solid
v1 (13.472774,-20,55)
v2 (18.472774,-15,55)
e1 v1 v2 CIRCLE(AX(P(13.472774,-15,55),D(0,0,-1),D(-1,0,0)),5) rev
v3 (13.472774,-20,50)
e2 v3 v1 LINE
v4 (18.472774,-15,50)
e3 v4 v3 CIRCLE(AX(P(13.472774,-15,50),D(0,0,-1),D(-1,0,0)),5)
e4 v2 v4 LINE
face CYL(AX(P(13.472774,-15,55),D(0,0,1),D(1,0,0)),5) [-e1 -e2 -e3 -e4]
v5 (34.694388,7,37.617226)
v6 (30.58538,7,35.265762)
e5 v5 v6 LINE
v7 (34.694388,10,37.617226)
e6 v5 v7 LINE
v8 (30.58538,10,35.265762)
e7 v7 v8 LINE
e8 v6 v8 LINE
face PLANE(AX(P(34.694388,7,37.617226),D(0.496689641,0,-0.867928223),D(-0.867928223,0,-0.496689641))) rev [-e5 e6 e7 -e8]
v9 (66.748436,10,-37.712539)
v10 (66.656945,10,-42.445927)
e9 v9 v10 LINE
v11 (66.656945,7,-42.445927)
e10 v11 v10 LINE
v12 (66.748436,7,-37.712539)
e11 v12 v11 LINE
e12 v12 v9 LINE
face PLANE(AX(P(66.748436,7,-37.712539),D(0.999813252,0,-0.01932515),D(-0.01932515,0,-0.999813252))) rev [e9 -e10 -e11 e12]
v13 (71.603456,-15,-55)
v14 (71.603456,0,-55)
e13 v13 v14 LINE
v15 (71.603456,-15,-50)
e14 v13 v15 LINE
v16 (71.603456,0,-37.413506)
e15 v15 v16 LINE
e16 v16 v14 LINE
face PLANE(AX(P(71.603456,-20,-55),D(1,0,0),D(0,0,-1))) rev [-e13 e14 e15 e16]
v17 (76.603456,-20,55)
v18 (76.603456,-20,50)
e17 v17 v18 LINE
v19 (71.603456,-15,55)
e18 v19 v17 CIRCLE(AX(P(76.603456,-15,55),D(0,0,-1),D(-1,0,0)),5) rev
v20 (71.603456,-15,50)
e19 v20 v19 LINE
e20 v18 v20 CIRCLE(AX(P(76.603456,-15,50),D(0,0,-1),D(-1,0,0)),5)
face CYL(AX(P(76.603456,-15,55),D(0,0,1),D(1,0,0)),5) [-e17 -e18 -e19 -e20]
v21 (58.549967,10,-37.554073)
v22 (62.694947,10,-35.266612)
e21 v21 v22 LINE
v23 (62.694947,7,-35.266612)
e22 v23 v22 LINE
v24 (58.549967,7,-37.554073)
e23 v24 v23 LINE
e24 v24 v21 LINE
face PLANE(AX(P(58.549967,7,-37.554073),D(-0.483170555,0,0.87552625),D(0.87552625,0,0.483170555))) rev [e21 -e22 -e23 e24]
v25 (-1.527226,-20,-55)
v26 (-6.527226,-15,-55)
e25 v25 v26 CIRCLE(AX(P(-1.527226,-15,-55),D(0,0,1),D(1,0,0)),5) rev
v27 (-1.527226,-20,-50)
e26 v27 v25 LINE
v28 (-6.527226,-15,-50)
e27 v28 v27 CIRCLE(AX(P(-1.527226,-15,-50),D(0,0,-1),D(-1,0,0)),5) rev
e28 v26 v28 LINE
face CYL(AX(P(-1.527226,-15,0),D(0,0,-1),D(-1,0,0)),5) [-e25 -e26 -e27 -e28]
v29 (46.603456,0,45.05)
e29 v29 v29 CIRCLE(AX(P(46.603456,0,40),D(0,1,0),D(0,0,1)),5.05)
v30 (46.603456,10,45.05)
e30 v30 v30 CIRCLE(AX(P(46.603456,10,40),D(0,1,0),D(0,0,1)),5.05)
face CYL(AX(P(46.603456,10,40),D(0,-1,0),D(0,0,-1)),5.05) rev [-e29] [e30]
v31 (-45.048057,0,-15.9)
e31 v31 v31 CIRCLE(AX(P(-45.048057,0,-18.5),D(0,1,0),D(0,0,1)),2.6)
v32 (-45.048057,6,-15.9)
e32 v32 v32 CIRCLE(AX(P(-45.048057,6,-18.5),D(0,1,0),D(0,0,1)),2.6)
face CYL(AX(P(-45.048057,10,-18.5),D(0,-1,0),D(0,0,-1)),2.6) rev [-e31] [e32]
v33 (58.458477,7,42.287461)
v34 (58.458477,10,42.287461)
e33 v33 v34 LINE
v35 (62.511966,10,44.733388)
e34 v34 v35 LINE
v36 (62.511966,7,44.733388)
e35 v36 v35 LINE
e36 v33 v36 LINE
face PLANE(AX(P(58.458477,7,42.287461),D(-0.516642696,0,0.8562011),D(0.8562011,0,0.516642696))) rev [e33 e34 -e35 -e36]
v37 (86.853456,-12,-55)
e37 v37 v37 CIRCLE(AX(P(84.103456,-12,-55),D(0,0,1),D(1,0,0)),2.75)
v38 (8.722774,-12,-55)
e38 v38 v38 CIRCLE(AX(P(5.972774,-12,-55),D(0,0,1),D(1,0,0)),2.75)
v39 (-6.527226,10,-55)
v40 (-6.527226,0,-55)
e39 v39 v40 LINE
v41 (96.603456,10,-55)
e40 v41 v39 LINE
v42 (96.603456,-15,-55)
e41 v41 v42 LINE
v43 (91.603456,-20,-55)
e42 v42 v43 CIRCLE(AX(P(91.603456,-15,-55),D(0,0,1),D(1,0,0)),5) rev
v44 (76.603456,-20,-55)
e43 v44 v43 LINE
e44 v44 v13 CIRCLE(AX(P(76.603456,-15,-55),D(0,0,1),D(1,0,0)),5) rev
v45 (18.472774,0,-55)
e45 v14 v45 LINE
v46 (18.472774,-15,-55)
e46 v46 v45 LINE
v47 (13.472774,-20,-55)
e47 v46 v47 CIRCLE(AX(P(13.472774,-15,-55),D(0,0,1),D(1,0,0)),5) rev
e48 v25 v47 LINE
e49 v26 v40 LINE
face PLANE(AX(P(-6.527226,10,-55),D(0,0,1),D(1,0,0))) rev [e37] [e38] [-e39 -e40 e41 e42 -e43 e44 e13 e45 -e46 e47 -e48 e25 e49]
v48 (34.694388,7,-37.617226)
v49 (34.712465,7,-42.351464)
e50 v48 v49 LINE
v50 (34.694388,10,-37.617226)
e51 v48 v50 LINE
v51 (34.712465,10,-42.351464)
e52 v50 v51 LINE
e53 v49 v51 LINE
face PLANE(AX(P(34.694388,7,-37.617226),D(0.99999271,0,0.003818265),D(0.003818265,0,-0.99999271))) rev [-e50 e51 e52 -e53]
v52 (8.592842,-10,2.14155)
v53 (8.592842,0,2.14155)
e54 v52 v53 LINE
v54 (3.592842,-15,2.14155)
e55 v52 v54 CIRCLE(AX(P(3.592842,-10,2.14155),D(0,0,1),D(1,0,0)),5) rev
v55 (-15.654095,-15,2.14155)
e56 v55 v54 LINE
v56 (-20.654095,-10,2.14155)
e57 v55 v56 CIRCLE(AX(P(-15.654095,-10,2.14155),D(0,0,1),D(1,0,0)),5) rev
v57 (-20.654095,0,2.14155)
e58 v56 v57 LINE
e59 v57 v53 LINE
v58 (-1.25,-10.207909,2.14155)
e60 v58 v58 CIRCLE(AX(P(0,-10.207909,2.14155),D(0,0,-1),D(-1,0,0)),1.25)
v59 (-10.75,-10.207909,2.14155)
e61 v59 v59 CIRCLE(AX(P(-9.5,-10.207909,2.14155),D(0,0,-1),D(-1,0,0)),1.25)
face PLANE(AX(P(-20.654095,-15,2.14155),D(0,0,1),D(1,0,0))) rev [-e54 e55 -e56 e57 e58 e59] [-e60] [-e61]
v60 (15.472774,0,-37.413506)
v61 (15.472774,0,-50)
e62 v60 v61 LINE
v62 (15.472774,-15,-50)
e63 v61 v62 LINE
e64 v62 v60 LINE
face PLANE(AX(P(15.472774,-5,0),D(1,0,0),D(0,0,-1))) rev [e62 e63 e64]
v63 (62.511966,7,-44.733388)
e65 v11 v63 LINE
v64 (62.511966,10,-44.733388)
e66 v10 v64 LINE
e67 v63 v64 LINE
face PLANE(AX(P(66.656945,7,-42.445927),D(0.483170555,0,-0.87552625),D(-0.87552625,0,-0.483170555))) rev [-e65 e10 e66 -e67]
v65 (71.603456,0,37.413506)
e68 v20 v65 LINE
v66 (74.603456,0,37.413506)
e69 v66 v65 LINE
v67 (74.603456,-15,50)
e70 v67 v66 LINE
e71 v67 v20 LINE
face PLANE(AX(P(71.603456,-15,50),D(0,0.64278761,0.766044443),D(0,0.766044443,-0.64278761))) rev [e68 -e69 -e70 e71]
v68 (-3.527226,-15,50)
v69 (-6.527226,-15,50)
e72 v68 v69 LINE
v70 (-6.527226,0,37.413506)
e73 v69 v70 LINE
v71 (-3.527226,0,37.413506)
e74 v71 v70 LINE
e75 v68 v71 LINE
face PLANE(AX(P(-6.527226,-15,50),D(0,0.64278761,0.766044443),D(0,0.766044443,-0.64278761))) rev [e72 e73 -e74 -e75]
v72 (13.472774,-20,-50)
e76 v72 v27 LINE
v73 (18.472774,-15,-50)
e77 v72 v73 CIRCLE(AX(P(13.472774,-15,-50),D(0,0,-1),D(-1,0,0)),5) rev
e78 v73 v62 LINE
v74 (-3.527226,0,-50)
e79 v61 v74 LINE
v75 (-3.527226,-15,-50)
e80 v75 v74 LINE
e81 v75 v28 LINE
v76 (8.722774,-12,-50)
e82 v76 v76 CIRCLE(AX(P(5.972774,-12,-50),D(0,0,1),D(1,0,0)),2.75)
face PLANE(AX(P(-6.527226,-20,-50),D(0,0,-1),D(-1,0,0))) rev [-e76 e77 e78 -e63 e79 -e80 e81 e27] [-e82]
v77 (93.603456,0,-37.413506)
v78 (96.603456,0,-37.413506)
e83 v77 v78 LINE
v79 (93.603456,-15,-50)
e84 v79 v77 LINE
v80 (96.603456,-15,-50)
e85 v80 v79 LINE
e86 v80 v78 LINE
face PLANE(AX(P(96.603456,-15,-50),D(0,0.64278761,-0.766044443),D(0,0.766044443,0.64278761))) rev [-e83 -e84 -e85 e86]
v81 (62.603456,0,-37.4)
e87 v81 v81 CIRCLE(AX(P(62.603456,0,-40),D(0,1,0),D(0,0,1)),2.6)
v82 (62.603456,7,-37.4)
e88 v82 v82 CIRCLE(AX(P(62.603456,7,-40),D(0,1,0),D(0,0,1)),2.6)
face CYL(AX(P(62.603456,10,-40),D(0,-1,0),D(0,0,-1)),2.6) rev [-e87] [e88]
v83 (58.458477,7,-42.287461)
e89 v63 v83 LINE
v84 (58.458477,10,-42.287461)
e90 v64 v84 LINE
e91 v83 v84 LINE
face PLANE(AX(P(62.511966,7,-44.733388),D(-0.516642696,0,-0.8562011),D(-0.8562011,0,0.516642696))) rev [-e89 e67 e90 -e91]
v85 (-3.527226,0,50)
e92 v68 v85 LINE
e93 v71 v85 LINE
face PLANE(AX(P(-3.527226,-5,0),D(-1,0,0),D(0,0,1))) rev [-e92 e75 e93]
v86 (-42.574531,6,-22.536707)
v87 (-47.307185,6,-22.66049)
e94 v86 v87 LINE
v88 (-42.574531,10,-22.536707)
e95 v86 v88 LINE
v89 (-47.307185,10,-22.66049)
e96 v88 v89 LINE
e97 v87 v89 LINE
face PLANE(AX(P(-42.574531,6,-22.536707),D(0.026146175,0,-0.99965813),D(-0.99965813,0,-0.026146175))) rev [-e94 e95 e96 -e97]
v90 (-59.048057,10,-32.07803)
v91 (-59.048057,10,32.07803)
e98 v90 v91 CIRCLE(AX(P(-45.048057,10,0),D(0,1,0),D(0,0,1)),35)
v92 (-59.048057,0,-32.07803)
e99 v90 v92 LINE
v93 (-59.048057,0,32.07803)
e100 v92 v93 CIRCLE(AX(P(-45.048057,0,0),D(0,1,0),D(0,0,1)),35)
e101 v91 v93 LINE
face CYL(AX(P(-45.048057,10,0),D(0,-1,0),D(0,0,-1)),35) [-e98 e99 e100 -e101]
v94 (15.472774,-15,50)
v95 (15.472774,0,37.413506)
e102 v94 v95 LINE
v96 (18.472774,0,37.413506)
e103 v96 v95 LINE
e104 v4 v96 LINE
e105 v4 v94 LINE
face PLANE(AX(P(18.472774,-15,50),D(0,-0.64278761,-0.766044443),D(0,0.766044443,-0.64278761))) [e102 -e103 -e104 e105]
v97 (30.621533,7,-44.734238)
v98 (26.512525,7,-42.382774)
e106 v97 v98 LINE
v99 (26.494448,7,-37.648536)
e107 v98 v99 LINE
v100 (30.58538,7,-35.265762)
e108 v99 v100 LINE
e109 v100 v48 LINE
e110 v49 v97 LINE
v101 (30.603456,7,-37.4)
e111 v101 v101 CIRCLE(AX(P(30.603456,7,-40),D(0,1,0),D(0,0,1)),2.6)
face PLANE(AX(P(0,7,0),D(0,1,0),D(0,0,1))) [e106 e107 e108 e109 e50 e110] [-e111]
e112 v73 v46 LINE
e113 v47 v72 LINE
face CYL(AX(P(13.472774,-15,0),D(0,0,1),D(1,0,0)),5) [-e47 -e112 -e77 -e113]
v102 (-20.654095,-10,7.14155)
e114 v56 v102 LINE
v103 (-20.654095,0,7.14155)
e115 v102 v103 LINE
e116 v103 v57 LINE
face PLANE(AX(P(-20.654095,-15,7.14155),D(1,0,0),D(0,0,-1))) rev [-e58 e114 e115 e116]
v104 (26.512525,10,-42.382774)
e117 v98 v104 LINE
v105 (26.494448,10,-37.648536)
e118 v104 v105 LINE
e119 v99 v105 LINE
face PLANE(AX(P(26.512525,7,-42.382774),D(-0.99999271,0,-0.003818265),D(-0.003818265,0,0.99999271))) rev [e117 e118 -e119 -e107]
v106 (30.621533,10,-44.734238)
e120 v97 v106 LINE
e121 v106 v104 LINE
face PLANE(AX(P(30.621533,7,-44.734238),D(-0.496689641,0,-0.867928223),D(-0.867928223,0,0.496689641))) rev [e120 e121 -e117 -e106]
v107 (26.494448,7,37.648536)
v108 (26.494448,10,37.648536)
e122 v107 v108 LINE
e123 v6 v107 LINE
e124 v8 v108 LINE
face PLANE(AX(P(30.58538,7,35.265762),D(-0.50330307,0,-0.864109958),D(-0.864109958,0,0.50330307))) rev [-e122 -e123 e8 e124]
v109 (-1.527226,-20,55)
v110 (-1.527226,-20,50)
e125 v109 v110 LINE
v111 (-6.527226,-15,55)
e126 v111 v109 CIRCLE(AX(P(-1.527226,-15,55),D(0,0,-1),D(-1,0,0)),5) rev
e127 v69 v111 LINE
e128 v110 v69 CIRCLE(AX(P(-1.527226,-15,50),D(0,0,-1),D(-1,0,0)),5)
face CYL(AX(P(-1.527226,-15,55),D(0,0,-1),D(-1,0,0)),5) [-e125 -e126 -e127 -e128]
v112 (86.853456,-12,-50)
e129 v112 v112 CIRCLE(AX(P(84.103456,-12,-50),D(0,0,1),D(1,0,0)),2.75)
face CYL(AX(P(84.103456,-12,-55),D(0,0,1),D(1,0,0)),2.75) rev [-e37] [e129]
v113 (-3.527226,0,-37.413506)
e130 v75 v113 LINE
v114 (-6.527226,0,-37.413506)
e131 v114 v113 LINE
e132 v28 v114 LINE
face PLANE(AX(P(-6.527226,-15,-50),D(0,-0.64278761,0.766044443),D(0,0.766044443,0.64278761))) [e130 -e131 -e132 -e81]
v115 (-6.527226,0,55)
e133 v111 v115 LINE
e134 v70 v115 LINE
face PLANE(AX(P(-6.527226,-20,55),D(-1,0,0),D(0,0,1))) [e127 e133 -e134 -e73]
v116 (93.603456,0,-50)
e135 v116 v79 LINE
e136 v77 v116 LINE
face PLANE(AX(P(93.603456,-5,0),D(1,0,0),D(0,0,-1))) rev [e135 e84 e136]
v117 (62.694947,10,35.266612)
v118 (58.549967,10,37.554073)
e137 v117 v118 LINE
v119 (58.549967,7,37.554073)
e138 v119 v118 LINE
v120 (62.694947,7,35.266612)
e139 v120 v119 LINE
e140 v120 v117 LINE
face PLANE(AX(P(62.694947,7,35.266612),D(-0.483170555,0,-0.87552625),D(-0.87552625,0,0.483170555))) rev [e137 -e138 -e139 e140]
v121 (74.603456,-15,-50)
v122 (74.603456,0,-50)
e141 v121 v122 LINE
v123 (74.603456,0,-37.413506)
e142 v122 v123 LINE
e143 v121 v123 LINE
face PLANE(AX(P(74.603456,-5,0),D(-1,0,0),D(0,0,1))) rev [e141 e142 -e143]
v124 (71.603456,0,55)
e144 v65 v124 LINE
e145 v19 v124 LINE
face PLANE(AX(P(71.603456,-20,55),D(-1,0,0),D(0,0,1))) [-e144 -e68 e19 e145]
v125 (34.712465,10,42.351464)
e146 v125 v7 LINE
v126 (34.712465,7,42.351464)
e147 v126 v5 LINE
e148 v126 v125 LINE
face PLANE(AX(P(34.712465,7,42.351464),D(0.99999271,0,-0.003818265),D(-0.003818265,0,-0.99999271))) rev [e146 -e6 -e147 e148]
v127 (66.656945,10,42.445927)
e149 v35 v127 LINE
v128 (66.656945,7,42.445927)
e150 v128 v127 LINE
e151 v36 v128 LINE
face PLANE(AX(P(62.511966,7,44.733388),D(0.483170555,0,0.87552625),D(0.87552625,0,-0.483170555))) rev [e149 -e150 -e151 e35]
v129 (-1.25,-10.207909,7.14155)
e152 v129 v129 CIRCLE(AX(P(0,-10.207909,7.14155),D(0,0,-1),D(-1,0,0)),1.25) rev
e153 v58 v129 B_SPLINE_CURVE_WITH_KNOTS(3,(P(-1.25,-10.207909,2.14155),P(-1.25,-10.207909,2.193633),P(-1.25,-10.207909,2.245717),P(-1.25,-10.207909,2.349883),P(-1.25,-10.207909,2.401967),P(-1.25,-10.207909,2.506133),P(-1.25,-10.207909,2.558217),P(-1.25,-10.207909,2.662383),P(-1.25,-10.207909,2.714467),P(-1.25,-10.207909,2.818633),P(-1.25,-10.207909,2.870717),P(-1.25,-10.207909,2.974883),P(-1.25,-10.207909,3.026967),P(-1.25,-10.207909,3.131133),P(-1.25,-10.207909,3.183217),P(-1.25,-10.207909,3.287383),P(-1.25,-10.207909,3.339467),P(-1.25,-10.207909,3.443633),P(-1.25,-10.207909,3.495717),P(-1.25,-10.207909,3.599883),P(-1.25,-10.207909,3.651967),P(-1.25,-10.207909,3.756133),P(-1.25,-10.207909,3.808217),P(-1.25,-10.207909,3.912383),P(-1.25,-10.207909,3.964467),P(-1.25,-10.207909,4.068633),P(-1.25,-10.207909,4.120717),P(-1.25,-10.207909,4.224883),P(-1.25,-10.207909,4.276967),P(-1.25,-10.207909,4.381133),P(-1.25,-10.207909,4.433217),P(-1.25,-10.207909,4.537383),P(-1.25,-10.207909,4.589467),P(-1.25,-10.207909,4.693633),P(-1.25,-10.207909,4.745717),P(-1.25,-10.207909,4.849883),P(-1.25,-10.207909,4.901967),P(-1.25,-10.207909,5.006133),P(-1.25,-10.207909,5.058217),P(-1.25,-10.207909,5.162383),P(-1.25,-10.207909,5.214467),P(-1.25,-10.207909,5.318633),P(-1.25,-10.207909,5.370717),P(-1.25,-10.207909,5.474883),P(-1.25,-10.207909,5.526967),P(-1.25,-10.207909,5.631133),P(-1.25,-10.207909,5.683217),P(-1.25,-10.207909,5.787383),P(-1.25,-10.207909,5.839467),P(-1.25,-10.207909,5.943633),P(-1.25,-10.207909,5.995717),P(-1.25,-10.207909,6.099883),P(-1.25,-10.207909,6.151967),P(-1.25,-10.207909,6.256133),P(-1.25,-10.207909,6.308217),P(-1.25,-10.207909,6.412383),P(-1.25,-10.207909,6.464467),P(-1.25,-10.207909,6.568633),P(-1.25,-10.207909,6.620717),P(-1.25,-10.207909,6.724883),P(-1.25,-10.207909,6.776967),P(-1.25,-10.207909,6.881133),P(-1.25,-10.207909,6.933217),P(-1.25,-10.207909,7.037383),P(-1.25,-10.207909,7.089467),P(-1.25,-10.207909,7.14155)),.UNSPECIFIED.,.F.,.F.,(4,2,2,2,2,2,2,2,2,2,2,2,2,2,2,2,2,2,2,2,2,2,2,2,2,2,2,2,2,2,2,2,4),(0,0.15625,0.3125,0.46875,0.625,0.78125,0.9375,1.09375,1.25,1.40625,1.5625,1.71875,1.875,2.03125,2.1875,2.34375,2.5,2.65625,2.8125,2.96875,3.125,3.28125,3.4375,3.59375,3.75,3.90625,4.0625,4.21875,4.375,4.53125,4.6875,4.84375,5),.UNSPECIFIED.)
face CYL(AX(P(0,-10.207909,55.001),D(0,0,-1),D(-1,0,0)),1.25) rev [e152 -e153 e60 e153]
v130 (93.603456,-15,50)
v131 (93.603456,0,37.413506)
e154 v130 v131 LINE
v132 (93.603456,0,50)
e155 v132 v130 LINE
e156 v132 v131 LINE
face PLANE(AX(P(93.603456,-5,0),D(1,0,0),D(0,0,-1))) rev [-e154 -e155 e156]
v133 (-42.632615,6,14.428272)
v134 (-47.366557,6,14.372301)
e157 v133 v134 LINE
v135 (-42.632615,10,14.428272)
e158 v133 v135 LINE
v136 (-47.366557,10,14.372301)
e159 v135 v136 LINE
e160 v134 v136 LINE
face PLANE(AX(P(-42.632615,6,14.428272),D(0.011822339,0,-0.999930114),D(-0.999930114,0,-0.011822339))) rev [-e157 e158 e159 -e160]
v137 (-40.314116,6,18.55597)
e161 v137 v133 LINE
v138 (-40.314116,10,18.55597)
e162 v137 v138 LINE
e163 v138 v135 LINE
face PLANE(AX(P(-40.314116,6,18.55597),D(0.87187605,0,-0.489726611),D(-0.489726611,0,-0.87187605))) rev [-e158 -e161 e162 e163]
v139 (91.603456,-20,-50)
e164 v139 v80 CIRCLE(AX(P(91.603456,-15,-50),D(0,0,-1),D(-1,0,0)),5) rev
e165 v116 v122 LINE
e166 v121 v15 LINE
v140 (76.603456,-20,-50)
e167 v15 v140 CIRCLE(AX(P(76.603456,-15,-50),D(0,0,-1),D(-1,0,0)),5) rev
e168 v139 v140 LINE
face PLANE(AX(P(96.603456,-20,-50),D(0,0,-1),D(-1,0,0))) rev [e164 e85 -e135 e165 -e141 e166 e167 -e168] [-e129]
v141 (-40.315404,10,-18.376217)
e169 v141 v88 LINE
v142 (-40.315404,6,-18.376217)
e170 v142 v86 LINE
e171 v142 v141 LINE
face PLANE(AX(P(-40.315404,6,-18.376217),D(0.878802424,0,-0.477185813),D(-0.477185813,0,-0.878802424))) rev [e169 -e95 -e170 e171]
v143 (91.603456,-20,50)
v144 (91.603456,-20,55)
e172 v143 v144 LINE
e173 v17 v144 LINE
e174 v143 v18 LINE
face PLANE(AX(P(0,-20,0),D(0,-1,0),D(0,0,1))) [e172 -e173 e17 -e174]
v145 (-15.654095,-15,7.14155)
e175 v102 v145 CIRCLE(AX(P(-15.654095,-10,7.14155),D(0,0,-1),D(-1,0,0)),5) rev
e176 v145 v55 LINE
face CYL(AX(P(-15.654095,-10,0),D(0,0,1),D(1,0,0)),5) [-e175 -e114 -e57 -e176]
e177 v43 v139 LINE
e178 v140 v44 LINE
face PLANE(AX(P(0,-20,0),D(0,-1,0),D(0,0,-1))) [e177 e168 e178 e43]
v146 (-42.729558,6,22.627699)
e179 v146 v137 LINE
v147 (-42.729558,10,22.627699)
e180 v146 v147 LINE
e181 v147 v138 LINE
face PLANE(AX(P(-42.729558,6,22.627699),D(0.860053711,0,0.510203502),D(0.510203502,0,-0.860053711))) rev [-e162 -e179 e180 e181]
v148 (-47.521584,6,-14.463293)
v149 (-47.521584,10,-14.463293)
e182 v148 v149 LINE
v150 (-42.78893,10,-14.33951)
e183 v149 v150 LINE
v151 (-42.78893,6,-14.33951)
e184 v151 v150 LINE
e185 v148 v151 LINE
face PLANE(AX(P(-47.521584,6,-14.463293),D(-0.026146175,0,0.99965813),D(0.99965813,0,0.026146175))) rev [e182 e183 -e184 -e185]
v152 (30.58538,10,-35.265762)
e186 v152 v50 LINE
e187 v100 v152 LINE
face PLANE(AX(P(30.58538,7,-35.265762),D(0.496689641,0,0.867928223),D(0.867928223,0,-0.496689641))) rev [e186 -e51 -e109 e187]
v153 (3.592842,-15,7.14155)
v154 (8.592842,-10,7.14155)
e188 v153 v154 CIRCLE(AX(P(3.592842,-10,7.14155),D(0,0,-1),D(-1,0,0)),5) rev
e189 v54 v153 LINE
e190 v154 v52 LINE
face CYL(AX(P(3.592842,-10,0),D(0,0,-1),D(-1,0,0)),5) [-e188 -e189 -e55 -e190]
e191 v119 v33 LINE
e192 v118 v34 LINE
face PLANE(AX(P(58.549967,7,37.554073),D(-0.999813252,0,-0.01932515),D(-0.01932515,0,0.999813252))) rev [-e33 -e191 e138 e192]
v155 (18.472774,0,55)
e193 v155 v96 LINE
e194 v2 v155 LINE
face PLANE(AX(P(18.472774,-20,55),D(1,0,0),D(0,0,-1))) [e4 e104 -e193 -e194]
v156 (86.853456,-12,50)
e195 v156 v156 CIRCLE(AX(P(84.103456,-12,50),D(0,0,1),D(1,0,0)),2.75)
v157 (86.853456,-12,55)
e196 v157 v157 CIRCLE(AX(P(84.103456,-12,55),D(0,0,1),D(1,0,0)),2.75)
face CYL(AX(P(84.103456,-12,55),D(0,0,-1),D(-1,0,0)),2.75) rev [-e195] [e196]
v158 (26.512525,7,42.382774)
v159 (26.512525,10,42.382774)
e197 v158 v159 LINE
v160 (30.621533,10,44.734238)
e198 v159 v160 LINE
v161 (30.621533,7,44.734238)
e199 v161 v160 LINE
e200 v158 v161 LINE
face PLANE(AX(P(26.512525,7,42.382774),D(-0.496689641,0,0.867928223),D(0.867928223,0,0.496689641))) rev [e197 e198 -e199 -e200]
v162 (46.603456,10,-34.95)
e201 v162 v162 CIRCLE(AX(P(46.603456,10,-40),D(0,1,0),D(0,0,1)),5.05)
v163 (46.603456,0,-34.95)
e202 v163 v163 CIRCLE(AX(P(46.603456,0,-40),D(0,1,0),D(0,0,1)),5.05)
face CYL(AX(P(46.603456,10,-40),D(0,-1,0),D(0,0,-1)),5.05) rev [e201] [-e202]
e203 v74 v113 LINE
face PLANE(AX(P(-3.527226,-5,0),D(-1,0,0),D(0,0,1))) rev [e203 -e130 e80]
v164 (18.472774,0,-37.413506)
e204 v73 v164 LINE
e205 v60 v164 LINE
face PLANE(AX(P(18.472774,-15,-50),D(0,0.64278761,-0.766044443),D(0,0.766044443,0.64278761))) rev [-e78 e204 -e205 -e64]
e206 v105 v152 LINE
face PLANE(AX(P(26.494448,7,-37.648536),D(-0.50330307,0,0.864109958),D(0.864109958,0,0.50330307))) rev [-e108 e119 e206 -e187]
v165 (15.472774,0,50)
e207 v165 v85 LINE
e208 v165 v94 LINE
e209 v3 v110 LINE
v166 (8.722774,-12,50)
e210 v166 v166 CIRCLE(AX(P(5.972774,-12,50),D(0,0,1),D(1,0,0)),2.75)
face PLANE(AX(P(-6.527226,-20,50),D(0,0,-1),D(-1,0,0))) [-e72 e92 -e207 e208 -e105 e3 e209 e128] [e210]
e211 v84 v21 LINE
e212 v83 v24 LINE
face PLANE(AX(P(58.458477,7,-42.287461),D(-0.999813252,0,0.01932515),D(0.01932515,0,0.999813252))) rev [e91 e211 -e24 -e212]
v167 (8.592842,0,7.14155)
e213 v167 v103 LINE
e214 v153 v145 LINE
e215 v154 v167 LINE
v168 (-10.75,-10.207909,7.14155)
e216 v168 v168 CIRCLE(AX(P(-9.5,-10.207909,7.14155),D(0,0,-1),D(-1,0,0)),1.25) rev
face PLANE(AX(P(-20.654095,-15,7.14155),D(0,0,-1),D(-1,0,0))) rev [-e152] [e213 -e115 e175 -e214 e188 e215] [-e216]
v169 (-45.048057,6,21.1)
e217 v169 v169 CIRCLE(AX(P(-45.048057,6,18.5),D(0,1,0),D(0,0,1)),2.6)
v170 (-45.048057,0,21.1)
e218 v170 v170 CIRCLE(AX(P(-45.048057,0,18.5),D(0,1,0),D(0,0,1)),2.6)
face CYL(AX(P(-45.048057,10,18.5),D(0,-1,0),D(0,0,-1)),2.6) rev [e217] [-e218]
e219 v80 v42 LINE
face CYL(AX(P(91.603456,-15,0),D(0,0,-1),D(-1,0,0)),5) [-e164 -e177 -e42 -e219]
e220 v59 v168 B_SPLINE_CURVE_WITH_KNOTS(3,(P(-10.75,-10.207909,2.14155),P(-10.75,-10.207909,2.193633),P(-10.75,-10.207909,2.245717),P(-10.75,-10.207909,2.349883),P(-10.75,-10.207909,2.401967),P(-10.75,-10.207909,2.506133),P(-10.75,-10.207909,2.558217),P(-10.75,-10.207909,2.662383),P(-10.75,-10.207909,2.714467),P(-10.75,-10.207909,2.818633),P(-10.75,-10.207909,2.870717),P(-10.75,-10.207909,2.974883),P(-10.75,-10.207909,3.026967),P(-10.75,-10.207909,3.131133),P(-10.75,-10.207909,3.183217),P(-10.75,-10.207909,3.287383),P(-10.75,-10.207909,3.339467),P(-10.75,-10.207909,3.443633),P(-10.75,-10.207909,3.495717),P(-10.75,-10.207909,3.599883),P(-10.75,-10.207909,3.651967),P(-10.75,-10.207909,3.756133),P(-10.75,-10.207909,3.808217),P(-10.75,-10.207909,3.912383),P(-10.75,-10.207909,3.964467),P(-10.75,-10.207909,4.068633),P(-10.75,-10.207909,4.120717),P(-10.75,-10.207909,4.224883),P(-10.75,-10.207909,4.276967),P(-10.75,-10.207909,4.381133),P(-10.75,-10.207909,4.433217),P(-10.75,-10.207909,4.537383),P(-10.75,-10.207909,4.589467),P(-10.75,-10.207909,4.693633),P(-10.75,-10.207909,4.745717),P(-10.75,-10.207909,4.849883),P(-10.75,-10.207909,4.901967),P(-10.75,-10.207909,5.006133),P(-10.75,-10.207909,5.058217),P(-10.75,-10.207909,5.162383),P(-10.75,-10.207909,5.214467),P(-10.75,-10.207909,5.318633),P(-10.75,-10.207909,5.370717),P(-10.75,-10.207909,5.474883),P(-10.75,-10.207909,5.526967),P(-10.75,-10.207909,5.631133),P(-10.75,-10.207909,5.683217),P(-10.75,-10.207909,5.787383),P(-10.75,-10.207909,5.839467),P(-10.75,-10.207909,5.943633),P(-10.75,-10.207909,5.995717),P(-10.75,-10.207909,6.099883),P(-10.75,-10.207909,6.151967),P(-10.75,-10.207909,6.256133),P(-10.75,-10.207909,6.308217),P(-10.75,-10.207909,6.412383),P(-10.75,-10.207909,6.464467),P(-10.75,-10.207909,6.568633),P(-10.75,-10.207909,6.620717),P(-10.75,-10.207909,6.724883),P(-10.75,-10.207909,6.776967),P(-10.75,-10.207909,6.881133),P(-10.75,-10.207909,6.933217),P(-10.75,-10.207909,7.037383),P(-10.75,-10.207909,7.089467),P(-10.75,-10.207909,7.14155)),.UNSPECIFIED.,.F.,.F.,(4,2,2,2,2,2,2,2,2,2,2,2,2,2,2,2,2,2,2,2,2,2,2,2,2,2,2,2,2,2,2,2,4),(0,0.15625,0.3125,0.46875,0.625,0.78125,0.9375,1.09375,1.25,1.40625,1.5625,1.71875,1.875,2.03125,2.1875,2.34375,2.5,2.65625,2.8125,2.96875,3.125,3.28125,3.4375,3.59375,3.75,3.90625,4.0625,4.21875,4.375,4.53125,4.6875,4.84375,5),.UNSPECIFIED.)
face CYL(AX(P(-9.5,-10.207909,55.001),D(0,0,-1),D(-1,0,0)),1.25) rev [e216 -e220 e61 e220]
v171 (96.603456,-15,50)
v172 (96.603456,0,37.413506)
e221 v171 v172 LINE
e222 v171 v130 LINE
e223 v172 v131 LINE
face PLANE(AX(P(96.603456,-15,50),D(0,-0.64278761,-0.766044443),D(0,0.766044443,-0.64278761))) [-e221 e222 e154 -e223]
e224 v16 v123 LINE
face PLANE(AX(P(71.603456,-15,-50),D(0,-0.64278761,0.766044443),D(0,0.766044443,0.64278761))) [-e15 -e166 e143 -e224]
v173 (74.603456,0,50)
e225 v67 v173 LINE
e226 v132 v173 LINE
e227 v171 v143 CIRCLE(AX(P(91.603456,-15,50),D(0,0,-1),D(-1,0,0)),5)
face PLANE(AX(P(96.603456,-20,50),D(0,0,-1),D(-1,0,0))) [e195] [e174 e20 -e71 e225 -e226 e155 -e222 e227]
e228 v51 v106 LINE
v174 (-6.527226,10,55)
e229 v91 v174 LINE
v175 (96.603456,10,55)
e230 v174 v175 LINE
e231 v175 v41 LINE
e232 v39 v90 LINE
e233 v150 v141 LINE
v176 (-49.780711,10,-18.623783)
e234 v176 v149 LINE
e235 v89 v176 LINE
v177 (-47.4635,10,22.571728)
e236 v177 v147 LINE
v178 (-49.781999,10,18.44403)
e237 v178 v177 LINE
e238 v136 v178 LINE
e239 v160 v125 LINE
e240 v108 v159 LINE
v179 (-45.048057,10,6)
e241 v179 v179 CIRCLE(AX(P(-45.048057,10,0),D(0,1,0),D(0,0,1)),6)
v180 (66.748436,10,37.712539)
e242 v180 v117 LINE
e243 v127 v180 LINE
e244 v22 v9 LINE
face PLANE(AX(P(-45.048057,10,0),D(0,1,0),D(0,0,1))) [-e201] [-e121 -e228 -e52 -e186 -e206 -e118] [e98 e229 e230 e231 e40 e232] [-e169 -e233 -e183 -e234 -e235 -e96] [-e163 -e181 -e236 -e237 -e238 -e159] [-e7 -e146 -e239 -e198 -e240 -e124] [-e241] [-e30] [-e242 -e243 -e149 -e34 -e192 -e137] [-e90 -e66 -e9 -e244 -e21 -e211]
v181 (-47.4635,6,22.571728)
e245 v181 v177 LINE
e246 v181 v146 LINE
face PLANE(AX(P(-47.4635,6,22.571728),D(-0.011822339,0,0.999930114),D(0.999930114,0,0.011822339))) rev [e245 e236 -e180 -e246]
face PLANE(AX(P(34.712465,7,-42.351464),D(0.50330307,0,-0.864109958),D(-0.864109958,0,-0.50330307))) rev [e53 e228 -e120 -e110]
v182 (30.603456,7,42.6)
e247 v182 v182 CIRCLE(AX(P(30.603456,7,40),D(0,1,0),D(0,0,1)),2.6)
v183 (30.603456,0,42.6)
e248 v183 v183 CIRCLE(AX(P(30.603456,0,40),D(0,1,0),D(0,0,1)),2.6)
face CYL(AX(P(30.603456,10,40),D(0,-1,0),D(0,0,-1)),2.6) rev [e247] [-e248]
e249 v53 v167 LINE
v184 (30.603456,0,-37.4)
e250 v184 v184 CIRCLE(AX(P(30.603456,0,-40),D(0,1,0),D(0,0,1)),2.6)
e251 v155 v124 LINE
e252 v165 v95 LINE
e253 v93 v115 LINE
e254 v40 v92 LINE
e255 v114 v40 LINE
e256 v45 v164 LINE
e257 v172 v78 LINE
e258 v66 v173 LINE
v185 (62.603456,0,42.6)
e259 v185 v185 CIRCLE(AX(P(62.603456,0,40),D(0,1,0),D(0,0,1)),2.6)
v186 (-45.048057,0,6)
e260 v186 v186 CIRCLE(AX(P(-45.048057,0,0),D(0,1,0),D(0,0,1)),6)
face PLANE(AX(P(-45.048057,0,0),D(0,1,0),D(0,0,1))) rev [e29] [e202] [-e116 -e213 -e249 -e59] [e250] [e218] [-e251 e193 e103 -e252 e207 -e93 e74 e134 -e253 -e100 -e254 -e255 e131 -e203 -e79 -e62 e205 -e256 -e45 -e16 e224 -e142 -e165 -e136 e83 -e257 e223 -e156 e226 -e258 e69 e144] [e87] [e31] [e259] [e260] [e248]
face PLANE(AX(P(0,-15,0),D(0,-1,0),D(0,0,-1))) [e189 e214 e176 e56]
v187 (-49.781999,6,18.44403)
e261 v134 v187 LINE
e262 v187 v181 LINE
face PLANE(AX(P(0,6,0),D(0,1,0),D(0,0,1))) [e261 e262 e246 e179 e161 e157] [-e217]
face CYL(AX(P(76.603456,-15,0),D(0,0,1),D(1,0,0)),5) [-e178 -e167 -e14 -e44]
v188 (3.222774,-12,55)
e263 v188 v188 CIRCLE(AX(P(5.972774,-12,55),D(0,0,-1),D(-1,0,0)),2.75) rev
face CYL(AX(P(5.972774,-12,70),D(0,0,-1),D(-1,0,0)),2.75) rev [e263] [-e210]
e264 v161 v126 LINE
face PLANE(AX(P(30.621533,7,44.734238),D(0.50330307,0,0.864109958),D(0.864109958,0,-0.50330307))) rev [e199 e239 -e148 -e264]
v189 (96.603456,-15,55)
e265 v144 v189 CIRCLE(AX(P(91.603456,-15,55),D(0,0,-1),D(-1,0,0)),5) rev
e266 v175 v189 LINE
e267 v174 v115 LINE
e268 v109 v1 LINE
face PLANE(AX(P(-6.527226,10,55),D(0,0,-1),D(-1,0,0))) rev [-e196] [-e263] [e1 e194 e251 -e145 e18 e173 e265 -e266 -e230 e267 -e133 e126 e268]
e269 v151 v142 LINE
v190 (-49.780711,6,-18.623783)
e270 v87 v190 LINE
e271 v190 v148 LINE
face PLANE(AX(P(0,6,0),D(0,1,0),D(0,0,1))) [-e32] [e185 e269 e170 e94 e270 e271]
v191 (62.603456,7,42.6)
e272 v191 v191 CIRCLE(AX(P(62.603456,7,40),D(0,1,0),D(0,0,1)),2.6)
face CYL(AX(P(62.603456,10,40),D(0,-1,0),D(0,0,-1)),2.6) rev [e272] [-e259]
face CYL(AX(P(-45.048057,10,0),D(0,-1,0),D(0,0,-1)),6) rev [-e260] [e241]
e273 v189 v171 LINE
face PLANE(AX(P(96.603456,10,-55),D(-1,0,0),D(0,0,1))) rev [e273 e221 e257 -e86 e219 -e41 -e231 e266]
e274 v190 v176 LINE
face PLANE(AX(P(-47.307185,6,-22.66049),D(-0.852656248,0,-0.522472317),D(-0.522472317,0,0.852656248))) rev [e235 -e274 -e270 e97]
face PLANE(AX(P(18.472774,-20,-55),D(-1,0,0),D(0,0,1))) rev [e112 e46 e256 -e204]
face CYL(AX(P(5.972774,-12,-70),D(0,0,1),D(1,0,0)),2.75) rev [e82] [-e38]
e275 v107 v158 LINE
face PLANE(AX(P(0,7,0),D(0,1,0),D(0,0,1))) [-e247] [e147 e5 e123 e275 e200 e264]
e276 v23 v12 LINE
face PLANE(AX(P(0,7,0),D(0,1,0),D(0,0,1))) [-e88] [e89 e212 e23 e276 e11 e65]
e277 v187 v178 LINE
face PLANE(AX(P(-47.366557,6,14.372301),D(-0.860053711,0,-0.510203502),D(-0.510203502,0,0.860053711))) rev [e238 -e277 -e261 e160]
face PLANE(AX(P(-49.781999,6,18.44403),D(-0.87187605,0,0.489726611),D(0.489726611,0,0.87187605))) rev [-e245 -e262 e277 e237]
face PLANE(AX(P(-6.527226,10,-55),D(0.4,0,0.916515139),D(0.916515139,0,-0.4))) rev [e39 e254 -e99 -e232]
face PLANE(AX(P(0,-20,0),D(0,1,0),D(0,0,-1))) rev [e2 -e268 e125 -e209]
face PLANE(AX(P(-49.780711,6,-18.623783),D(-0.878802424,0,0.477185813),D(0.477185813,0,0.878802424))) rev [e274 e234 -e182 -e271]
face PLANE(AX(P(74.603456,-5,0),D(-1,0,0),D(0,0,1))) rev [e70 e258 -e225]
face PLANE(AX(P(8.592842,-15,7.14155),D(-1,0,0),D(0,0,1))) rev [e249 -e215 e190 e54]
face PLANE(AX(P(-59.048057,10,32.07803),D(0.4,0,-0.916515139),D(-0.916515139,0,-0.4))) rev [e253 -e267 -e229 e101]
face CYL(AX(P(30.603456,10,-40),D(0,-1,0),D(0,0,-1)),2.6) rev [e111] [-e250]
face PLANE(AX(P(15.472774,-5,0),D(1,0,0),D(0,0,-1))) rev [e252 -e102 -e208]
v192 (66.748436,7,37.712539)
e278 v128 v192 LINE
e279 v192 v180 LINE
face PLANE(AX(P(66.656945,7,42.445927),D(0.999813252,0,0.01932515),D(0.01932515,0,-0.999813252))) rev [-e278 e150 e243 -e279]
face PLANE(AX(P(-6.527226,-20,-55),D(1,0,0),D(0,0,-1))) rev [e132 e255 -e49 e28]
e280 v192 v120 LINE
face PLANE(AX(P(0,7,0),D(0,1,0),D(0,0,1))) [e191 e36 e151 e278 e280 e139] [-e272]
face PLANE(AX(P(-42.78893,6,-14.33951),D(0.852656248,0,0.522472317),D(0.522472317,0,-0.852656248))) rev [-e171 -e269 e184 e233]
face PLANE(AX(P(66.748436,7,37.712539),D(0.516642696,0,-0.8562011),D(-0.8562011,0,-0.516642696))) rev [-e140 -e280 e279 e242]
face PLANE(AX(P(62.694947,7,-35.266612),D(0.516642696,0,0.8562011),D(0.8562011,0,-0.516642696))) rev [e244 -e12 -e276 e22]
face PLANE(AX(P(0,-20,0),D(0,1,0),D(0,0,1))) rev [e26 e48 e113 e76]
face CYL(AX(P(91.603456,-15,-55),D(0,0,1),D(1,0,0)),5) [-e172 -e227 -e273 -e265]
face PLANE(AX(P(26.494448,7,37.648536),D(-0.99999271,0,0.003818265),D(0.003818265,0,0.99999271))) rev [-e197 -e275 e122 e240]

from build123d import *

# Parameters (mm, degrees)
SKETCH1_R            = 5.05
SKETCH1_R_2          = 6
SKETCH1_R_3          = 2.6
BOSS_EXTRUDE1_DEPTH  = 10
SKETCH3_W            = 25
SKETCH3_H            = 5
BOSS_EXTRUDE3_DEPTH  = 20
FILLET2_R            = 5
SKETCH4_R            = 2.75
CUT_EXTRUDE1_DEPTH   = 20
RIB9_REACH           = 120.579
SKETCH10_WALL_W      = 258.738758418
SKETCH10_WALL_H      = 3
RIB10_REACH          = 116.592
SKETCH11_WALL_W      = 250.765351916
SKETCH11_WALL_H      = 3
SKETCH12_W           = 25
SKETCH12_H           = 5
BOSS_EXTRUDE4_DEPTH  = 20
FILLET3_R            = 5
SKETCH13_R           = 2.75
CUT_EXTRUDE2_DEPTH   = 145.073688744
RIB11_REACH          = 188.093
SKETCH14_WALL_W      = 393.76792997
SKETCH14_WALL_H      = 3
RIB12_REACH          = 164.552
SKETCH15_WALL_W      = 347.125659706
SKETCH15_WALL_H      = 3
FILLET2_OF_MIRROR3_R = 5
FILLET3_OF_MIRROR3_R = 5
SKETCH16_W           = 29.246937375
SKETCH16_H           = 5
BOSS_EXTRUDE5_DEPTH  = 15
FILLET4_R            = 5
CUT_EXTRUDE3_REACH   = 116.006
SKETCH17_R           = 1.25
CUT_EXTRUDE4_DEPTH   = 4
CUT_EXTRUDE5_DEPTH   = 3


with BuildPart() as part:
    # Sketch1 → Boss-Extrude1 (new body)
    with BuildSketch(Plane(origin=(0, 0, 0), x_dir=(1, 0, 0), z_dir=(0, 1, 0))):
        with BuildLine():
            Line((-6.527225889, 55), (-59.0480575, 32.078029865))
            ThreePointArc((-59.0480575, 32.078029865), (-80.0480575, 0), (-59.0480575, -32.078029865))
            Line((-59.0480575, -32.078029865), (-6.527225889, -55))
            Line((-6.527225889, -55), (96.603456399, -55))
            Line((96.603456399, -55), (96.603456399, -40))
            Line((96.603456399, -40), (96.603456399, 55))
            Line((96.603456399, 55), (-6.527225889, 55))
        make_face()
        with Locations((46.603456399, 40)):
            Circle(SKETCH1_R, mode=Mode.SUBTRACT)
        with Locations((46.603456399, -40)):
            Circle(SKETCH1_R, mode=Mode.SUBTRACT)
        with Locations((-45.0480575, 0)):
            Circle(SKETCH1_R_2, mode=Mode.SUBTRACT)
        with Locations((30.603456399, 40)):
            Circle(SKETCH1_R_3, mode=Mode.SUBTRACT)
        with Locations((62.603456399, 40)):
            Circle(SKETCH1_R_3, mode=Mode.SUBTRACT)
        with Locations((30.603456399, -40)):
            Circle(SKETCH1_R_3, mode=Mode.SUBTRACT)
        with Locations((62.603456399, -40)):
            Circle(SKETCH1_R_3, mode=Mode.SUBTRACT)
        with Locations((-45.0480575, 18.5)):
            Circle(SKETCH1_R_3, mode=Mode.SUBTRACT)
        with Locations((-45.0480575, -18.5)):
            Circle(SKETCH1_R_3, mode=Mode.SUBTRACT)
    extrude(amount=BOSS_EXTRUDE1_DEPTH)

    # Sketch3 → Boss-Extrude3 (add)
    with BuildSketch(Plane.XZ):
        with Locations((5.972774111, -52.5)):
            Rectangle(SKETCH3_W, SKETCH3_H)
    boss_extrude3 = extrude(amount=BOSS_EXTRUDE3_DEPTH)

    # Fillet2
    fillet2_edges = [part.edges().sort_by_distance(p)[0] for p in [
        (-6.527225889, -20, -52.5),
        (18.472774111, -20, -52.5),
    ]]
    fillet(fillet2_edges, radius=FILLET2_R)

    # Sketch4 → Cut-Extrude1 (cut)
    with BuildSketch(Plane.XY.offset(-50)):
        with Locations((5.972774111, -12)):
            Circle(SKETCH4_R)
    cut_extrude1 = extrude(amount=-CUT_EXTRUDE1_DEPTH, mode=Mode.SUBTRACT)

    # Sketch10 wall → Rib9 (add, up to next)
    with BuildSketch(Plane(origin=(-6.527225889, -7.5, -43.706752766), x_dir=(0, 0.76604444311, 0.642787609697), z_dir=(0, 0.642787609697, -0.76604444311)), mode=Mode.PRIVATE) as rib9_sk1:
        with Locations((0, 1.5)):
            Rectangle(SKETCH10_WALL_W, SKETCH10_WALL_H)
    rib9_tool1 = extrude(rib9_sk1.sketch, amount=RIB9_REACH, mode=Mode.PRIVATE) - part.part
    rib9 = rib9_tool1.solids().sort_by_distance((-6.527225889, -7.5, -43.706752766))[0]
    add(rib9)

    # Sketch11 wall → Rib10 (add, up to next)
    with BuildSketch(Plane(origin=(18.472774111, -7.5, -43.706752766), x_dir=(0, 0.76604444311, 0.642787609697), z_dir=(0, -0.642787609697, 0.76604444311)), mode=Mode.PRIVATE) as rib10_sk1:
        with Locations((0, 1.5)):
            Rectangle(SKETCH11_WALL_W, SKETCH11_WALL_H)
    rib10_tool1 = extrude(rib10_sk1.sketch, amount=-RIB10_REACH, mode=Mode.PRIVATE) - part.part
    rib10 = rib10_tool1.solids().sort_by_distance((18.472774111, -7.5, -43.706752766))[0]
    add(rib10)

    # Sketch12 → Boss-Extrude4 (add)
    with BuildSketch(Plane.XZ):
        with Locations((84.103456399, -52.5)):
            Rectangle(SKETCH12_W, SKETCH12_H)
    boss_extrude4 = extrude(amount=BOSS_EXTRUDE4_DEPTH)

    # Fillet3
    fillet3_edges = [part.edges().sort_by_distance(p)[0] for p in [
        (96.603456399, -20, -52.5),
        (71.603456399, -20, -52.5),
    ]]
    fillet(fillet3_edges, radius=FILLET3_R)

    # Sketch13 → Cut-Extrude2 (cut, through all)
    with BuildSketch(Plane.XY.offset(-50)):
        with Locations((84.103456399, -12)):
            Circle(SKETCH13_R)
    cut_extrude2 = extrude(amount=-CUT_EXTRUDE2_DEPTH, mode=Mode.SUBTRACT)

    # Sketch14 wall → Rib11 (add, up to next)
    with BuildSketch(Plane(origin=(96.603456399, -7.5, -43.706752766), x_dir=(0, 0.76604444311, 0.642787609697), z_dir=(0, -0.642787609697, 0.76604444311)), mode=Mode.PRIVATE) as rib11_sk1:
        with Locations((0, 1.5)):
            Rectangle(SKETCH14_WALL_W, SKETCH14_WALL_H)
    rib11_tool1 = extrude(rib11_sk1.sketch, amount=-RIB11_REACH, mode=Mode.PRIVATE) - part.part
    rib11 = rib11_tool1.solids().sort_by_distance((96.603456399, -7.5, -43.706752766))[0]
    add(rib11)

    # Sketch15 wall → Rib12 (add, up to next)
    with BuildSketch(Plane(origin=(71.603456399, -7.331327668, -43.565219875), x_dir=(0, 0.766044443114, 0.642787609692), z_dir=(0, 0.642787609692, -0.766044443114)), mode=Mode.PRIVATE) as rib12_sk1:
        with Locations((0, 1.5)):
            Rectangle(SKETCH15_WALL_W, SKETCH15_WALL_H)
    rib12_tool1 = extrude(rib12_sk1.sketch, amount=RIB12_REACH, mode=Mode.PRIVATE) - part.part
    rib12 = rib12_tool1.solids().sort_by_distance((71.603456399, -7.331327668, -43.565219875))[0]
    add(rib12)

    # Mirror3: Boss-Extrude3, Cut-Extrude1, Rib9, Rib10, Boss-Extrude4, Cut-Extrude2, Rib11, Rib12 across plane
    add(boss_extrude3.mirror(Plane.XY))
    add(cut_extrude1.mirror(Plane.XY), mode=Mode.SUBTRACT)
    add(rib9.mirror(Plane.XY))
    add(rib10.mirror(Plane.XY))
    add(boss_extrude4.mirror(Plane.XY))
    add(cut_extrude2.mirror(Plane.XY), mode=Mode.SUBTRACT)
    add(rib11.mirror(Plane.XY))
    add(rib12.mirror(Plane.XY))

    # Fillet2 of Mirror3
    fillet2_of_mirror3_edges = [part.edges().sort_by_distance(p)[0] for p in [
        (-6.527225889, -20, 52.5),
        (18.472774111, -20, 52.5),
    ]]
    fillet(fillet2_of_mirror3_edges, radius=FILLET2_OF_MIRROR3_R)

    # Fillet3 of Mirror3
    fillet3_of_mirror3_edges = [part.edges().sort_by_distance(p)[0] for p in [
        (96.603456399, -20, 52.5),
        (71.603456399, -20, 52.5),
    ]]
    fillet(fillet3_of_mirror3_edges, radius=FILLET3_OF_MIRROR3_R)

    # Sketch16 → Boss-Extrude5 (add)
    with BuildSketch(Plane.XZ):
        with Locations((-6.030626379, 4.641549892)):
            Rectangle(SKETCH16_W, SKETCH16_H)
    extrude(amount=BOSS_EXTRUDE5_DEPTH)

    # Fillet4
    fillet4_edges = [part.edges().sort_by_distance(p)[0] for p in [
        (8.592842309, -15, 4.641549892),
        (-20.654095066, -15, 4.641549892),
    ]]
    fillet(fillet4_edges, radius=FILLET4_R)

    # Sketch17 → Cut-Extrude3 (cut, up to next)
    with BuildSketch(Plane(origin=(0, 0, 2.141549892), x_dir=(-1, 0, 0), z_dir=(0, 0, -1)), mode=Mode.PRIVATE) as cut_extrude3_sk1:
        with Locations((0, -10.207909403)):
            Circle(SKETCH17_R)
    cut_extrude3_tool1 = extrude(cut_extrude3_sk1.sketch, amount=-CUT_EXTRUDE3_REACH, mode=Mode.PRIVATE) & part.part
    # Sketch17 → Cut-Extrude3 (cut, up to next)
    with BuildSketch(Plane(origin=(0, 0, 2.141549892), x_dir=(-1, 0, 0), z_dir=(0, 0, -1)), mode=Mode.PRIVATE) as cut_extrude3_sk2:
        with Locations((9.5, -10.207909403)):
            Circle(SKETCH17_R)
    cut_extrude3_tool2 = extrude(cut_extrude3_sk2.sketch, amount=-CUT_EXTRUDE3_REACH, mode=Mode.PRIVATE) & part.part
    add(cut_extrude3_tool1.solids().sort_by_distance((0, -10.207909, 2.14155))[0], mode=Mode.SUBTRACT)
    add(cut_extrude3_tool2.solids().sort_by_distance((-9.5, -10.207909, 2.14155))[0], mode=Mode.SUBTRACT)

    # Sketch19 → Cut-Extrude4 (cut)
    with BuildSketch(Plane(origin=(0, 10, 0), x_dir=(1, 0, 0), z_dir=(0, 1, 0))):
        Polygon((-42.788929966, 14.33951011), (-40.315403797, 18.37621689), (-42.57453133, 22.536706779), (-47.307185033, 22.66048989), (-49.780711203, 18.62378311), (-47.52158367, 14.463293221), align=None)
        Polygon((-42.729558415, -22.627698551), (-40.314116153, -18.555970169), (-42.632615238, -14.428271618), (-47.366556585, -14.372301449), (-49.781998846, -18.444029831), (-47.463499761, -22.571728382), align=None)
    extrude(amount=-CUT_EXTRUDE4_DEPTH, mode=Mode.SUBTRACT)

    # Sketch20 → Cut-Extrude5 (cut)
    with BuildSketch(Plane(origin=(0, 10, 0), x_dir=(1, 0, 0), z_dir=(0, 1, 0))):
        Polygon((58.549967326, 37.554072841), (62.694946918, 35.266611909), (66.748435991, 37.712539068), (66.656945472, 42.445927159), (62.51196588, 44.733388091), (58.458476807, 42.287460932), align=None)
        Polygon((26.494447933, 37.648536039), (30.585379692, 35.265762304), (34.694388158, 37.617226264), (34.712464865, 42.351463961), (30.621533106, 44.734237696), (26.51252464, 42.382773736), align=None)
        Polygon((58.549967326, -37.554072841), (58.458476807, -42.287460932), (62.51196588, -44.733388091), (66.656945472, -42.445927159), (66.748435991, -37.712539068), (62.694946918, -35.266611909), align=None)
        Polygon((26.494447933, -37.648536039), (26.51252464, -42.382773736), (30.621533106, -44.734237696), (34.712464865, -42.351463961), (34.694388158, -37.617226264), (30.585379692, -35.265762304), align=None)
    extrude(amount=-CUT_EXTRUDE5_DEPTH, mode=Mode.SUBTRACT)


solid = part.part
